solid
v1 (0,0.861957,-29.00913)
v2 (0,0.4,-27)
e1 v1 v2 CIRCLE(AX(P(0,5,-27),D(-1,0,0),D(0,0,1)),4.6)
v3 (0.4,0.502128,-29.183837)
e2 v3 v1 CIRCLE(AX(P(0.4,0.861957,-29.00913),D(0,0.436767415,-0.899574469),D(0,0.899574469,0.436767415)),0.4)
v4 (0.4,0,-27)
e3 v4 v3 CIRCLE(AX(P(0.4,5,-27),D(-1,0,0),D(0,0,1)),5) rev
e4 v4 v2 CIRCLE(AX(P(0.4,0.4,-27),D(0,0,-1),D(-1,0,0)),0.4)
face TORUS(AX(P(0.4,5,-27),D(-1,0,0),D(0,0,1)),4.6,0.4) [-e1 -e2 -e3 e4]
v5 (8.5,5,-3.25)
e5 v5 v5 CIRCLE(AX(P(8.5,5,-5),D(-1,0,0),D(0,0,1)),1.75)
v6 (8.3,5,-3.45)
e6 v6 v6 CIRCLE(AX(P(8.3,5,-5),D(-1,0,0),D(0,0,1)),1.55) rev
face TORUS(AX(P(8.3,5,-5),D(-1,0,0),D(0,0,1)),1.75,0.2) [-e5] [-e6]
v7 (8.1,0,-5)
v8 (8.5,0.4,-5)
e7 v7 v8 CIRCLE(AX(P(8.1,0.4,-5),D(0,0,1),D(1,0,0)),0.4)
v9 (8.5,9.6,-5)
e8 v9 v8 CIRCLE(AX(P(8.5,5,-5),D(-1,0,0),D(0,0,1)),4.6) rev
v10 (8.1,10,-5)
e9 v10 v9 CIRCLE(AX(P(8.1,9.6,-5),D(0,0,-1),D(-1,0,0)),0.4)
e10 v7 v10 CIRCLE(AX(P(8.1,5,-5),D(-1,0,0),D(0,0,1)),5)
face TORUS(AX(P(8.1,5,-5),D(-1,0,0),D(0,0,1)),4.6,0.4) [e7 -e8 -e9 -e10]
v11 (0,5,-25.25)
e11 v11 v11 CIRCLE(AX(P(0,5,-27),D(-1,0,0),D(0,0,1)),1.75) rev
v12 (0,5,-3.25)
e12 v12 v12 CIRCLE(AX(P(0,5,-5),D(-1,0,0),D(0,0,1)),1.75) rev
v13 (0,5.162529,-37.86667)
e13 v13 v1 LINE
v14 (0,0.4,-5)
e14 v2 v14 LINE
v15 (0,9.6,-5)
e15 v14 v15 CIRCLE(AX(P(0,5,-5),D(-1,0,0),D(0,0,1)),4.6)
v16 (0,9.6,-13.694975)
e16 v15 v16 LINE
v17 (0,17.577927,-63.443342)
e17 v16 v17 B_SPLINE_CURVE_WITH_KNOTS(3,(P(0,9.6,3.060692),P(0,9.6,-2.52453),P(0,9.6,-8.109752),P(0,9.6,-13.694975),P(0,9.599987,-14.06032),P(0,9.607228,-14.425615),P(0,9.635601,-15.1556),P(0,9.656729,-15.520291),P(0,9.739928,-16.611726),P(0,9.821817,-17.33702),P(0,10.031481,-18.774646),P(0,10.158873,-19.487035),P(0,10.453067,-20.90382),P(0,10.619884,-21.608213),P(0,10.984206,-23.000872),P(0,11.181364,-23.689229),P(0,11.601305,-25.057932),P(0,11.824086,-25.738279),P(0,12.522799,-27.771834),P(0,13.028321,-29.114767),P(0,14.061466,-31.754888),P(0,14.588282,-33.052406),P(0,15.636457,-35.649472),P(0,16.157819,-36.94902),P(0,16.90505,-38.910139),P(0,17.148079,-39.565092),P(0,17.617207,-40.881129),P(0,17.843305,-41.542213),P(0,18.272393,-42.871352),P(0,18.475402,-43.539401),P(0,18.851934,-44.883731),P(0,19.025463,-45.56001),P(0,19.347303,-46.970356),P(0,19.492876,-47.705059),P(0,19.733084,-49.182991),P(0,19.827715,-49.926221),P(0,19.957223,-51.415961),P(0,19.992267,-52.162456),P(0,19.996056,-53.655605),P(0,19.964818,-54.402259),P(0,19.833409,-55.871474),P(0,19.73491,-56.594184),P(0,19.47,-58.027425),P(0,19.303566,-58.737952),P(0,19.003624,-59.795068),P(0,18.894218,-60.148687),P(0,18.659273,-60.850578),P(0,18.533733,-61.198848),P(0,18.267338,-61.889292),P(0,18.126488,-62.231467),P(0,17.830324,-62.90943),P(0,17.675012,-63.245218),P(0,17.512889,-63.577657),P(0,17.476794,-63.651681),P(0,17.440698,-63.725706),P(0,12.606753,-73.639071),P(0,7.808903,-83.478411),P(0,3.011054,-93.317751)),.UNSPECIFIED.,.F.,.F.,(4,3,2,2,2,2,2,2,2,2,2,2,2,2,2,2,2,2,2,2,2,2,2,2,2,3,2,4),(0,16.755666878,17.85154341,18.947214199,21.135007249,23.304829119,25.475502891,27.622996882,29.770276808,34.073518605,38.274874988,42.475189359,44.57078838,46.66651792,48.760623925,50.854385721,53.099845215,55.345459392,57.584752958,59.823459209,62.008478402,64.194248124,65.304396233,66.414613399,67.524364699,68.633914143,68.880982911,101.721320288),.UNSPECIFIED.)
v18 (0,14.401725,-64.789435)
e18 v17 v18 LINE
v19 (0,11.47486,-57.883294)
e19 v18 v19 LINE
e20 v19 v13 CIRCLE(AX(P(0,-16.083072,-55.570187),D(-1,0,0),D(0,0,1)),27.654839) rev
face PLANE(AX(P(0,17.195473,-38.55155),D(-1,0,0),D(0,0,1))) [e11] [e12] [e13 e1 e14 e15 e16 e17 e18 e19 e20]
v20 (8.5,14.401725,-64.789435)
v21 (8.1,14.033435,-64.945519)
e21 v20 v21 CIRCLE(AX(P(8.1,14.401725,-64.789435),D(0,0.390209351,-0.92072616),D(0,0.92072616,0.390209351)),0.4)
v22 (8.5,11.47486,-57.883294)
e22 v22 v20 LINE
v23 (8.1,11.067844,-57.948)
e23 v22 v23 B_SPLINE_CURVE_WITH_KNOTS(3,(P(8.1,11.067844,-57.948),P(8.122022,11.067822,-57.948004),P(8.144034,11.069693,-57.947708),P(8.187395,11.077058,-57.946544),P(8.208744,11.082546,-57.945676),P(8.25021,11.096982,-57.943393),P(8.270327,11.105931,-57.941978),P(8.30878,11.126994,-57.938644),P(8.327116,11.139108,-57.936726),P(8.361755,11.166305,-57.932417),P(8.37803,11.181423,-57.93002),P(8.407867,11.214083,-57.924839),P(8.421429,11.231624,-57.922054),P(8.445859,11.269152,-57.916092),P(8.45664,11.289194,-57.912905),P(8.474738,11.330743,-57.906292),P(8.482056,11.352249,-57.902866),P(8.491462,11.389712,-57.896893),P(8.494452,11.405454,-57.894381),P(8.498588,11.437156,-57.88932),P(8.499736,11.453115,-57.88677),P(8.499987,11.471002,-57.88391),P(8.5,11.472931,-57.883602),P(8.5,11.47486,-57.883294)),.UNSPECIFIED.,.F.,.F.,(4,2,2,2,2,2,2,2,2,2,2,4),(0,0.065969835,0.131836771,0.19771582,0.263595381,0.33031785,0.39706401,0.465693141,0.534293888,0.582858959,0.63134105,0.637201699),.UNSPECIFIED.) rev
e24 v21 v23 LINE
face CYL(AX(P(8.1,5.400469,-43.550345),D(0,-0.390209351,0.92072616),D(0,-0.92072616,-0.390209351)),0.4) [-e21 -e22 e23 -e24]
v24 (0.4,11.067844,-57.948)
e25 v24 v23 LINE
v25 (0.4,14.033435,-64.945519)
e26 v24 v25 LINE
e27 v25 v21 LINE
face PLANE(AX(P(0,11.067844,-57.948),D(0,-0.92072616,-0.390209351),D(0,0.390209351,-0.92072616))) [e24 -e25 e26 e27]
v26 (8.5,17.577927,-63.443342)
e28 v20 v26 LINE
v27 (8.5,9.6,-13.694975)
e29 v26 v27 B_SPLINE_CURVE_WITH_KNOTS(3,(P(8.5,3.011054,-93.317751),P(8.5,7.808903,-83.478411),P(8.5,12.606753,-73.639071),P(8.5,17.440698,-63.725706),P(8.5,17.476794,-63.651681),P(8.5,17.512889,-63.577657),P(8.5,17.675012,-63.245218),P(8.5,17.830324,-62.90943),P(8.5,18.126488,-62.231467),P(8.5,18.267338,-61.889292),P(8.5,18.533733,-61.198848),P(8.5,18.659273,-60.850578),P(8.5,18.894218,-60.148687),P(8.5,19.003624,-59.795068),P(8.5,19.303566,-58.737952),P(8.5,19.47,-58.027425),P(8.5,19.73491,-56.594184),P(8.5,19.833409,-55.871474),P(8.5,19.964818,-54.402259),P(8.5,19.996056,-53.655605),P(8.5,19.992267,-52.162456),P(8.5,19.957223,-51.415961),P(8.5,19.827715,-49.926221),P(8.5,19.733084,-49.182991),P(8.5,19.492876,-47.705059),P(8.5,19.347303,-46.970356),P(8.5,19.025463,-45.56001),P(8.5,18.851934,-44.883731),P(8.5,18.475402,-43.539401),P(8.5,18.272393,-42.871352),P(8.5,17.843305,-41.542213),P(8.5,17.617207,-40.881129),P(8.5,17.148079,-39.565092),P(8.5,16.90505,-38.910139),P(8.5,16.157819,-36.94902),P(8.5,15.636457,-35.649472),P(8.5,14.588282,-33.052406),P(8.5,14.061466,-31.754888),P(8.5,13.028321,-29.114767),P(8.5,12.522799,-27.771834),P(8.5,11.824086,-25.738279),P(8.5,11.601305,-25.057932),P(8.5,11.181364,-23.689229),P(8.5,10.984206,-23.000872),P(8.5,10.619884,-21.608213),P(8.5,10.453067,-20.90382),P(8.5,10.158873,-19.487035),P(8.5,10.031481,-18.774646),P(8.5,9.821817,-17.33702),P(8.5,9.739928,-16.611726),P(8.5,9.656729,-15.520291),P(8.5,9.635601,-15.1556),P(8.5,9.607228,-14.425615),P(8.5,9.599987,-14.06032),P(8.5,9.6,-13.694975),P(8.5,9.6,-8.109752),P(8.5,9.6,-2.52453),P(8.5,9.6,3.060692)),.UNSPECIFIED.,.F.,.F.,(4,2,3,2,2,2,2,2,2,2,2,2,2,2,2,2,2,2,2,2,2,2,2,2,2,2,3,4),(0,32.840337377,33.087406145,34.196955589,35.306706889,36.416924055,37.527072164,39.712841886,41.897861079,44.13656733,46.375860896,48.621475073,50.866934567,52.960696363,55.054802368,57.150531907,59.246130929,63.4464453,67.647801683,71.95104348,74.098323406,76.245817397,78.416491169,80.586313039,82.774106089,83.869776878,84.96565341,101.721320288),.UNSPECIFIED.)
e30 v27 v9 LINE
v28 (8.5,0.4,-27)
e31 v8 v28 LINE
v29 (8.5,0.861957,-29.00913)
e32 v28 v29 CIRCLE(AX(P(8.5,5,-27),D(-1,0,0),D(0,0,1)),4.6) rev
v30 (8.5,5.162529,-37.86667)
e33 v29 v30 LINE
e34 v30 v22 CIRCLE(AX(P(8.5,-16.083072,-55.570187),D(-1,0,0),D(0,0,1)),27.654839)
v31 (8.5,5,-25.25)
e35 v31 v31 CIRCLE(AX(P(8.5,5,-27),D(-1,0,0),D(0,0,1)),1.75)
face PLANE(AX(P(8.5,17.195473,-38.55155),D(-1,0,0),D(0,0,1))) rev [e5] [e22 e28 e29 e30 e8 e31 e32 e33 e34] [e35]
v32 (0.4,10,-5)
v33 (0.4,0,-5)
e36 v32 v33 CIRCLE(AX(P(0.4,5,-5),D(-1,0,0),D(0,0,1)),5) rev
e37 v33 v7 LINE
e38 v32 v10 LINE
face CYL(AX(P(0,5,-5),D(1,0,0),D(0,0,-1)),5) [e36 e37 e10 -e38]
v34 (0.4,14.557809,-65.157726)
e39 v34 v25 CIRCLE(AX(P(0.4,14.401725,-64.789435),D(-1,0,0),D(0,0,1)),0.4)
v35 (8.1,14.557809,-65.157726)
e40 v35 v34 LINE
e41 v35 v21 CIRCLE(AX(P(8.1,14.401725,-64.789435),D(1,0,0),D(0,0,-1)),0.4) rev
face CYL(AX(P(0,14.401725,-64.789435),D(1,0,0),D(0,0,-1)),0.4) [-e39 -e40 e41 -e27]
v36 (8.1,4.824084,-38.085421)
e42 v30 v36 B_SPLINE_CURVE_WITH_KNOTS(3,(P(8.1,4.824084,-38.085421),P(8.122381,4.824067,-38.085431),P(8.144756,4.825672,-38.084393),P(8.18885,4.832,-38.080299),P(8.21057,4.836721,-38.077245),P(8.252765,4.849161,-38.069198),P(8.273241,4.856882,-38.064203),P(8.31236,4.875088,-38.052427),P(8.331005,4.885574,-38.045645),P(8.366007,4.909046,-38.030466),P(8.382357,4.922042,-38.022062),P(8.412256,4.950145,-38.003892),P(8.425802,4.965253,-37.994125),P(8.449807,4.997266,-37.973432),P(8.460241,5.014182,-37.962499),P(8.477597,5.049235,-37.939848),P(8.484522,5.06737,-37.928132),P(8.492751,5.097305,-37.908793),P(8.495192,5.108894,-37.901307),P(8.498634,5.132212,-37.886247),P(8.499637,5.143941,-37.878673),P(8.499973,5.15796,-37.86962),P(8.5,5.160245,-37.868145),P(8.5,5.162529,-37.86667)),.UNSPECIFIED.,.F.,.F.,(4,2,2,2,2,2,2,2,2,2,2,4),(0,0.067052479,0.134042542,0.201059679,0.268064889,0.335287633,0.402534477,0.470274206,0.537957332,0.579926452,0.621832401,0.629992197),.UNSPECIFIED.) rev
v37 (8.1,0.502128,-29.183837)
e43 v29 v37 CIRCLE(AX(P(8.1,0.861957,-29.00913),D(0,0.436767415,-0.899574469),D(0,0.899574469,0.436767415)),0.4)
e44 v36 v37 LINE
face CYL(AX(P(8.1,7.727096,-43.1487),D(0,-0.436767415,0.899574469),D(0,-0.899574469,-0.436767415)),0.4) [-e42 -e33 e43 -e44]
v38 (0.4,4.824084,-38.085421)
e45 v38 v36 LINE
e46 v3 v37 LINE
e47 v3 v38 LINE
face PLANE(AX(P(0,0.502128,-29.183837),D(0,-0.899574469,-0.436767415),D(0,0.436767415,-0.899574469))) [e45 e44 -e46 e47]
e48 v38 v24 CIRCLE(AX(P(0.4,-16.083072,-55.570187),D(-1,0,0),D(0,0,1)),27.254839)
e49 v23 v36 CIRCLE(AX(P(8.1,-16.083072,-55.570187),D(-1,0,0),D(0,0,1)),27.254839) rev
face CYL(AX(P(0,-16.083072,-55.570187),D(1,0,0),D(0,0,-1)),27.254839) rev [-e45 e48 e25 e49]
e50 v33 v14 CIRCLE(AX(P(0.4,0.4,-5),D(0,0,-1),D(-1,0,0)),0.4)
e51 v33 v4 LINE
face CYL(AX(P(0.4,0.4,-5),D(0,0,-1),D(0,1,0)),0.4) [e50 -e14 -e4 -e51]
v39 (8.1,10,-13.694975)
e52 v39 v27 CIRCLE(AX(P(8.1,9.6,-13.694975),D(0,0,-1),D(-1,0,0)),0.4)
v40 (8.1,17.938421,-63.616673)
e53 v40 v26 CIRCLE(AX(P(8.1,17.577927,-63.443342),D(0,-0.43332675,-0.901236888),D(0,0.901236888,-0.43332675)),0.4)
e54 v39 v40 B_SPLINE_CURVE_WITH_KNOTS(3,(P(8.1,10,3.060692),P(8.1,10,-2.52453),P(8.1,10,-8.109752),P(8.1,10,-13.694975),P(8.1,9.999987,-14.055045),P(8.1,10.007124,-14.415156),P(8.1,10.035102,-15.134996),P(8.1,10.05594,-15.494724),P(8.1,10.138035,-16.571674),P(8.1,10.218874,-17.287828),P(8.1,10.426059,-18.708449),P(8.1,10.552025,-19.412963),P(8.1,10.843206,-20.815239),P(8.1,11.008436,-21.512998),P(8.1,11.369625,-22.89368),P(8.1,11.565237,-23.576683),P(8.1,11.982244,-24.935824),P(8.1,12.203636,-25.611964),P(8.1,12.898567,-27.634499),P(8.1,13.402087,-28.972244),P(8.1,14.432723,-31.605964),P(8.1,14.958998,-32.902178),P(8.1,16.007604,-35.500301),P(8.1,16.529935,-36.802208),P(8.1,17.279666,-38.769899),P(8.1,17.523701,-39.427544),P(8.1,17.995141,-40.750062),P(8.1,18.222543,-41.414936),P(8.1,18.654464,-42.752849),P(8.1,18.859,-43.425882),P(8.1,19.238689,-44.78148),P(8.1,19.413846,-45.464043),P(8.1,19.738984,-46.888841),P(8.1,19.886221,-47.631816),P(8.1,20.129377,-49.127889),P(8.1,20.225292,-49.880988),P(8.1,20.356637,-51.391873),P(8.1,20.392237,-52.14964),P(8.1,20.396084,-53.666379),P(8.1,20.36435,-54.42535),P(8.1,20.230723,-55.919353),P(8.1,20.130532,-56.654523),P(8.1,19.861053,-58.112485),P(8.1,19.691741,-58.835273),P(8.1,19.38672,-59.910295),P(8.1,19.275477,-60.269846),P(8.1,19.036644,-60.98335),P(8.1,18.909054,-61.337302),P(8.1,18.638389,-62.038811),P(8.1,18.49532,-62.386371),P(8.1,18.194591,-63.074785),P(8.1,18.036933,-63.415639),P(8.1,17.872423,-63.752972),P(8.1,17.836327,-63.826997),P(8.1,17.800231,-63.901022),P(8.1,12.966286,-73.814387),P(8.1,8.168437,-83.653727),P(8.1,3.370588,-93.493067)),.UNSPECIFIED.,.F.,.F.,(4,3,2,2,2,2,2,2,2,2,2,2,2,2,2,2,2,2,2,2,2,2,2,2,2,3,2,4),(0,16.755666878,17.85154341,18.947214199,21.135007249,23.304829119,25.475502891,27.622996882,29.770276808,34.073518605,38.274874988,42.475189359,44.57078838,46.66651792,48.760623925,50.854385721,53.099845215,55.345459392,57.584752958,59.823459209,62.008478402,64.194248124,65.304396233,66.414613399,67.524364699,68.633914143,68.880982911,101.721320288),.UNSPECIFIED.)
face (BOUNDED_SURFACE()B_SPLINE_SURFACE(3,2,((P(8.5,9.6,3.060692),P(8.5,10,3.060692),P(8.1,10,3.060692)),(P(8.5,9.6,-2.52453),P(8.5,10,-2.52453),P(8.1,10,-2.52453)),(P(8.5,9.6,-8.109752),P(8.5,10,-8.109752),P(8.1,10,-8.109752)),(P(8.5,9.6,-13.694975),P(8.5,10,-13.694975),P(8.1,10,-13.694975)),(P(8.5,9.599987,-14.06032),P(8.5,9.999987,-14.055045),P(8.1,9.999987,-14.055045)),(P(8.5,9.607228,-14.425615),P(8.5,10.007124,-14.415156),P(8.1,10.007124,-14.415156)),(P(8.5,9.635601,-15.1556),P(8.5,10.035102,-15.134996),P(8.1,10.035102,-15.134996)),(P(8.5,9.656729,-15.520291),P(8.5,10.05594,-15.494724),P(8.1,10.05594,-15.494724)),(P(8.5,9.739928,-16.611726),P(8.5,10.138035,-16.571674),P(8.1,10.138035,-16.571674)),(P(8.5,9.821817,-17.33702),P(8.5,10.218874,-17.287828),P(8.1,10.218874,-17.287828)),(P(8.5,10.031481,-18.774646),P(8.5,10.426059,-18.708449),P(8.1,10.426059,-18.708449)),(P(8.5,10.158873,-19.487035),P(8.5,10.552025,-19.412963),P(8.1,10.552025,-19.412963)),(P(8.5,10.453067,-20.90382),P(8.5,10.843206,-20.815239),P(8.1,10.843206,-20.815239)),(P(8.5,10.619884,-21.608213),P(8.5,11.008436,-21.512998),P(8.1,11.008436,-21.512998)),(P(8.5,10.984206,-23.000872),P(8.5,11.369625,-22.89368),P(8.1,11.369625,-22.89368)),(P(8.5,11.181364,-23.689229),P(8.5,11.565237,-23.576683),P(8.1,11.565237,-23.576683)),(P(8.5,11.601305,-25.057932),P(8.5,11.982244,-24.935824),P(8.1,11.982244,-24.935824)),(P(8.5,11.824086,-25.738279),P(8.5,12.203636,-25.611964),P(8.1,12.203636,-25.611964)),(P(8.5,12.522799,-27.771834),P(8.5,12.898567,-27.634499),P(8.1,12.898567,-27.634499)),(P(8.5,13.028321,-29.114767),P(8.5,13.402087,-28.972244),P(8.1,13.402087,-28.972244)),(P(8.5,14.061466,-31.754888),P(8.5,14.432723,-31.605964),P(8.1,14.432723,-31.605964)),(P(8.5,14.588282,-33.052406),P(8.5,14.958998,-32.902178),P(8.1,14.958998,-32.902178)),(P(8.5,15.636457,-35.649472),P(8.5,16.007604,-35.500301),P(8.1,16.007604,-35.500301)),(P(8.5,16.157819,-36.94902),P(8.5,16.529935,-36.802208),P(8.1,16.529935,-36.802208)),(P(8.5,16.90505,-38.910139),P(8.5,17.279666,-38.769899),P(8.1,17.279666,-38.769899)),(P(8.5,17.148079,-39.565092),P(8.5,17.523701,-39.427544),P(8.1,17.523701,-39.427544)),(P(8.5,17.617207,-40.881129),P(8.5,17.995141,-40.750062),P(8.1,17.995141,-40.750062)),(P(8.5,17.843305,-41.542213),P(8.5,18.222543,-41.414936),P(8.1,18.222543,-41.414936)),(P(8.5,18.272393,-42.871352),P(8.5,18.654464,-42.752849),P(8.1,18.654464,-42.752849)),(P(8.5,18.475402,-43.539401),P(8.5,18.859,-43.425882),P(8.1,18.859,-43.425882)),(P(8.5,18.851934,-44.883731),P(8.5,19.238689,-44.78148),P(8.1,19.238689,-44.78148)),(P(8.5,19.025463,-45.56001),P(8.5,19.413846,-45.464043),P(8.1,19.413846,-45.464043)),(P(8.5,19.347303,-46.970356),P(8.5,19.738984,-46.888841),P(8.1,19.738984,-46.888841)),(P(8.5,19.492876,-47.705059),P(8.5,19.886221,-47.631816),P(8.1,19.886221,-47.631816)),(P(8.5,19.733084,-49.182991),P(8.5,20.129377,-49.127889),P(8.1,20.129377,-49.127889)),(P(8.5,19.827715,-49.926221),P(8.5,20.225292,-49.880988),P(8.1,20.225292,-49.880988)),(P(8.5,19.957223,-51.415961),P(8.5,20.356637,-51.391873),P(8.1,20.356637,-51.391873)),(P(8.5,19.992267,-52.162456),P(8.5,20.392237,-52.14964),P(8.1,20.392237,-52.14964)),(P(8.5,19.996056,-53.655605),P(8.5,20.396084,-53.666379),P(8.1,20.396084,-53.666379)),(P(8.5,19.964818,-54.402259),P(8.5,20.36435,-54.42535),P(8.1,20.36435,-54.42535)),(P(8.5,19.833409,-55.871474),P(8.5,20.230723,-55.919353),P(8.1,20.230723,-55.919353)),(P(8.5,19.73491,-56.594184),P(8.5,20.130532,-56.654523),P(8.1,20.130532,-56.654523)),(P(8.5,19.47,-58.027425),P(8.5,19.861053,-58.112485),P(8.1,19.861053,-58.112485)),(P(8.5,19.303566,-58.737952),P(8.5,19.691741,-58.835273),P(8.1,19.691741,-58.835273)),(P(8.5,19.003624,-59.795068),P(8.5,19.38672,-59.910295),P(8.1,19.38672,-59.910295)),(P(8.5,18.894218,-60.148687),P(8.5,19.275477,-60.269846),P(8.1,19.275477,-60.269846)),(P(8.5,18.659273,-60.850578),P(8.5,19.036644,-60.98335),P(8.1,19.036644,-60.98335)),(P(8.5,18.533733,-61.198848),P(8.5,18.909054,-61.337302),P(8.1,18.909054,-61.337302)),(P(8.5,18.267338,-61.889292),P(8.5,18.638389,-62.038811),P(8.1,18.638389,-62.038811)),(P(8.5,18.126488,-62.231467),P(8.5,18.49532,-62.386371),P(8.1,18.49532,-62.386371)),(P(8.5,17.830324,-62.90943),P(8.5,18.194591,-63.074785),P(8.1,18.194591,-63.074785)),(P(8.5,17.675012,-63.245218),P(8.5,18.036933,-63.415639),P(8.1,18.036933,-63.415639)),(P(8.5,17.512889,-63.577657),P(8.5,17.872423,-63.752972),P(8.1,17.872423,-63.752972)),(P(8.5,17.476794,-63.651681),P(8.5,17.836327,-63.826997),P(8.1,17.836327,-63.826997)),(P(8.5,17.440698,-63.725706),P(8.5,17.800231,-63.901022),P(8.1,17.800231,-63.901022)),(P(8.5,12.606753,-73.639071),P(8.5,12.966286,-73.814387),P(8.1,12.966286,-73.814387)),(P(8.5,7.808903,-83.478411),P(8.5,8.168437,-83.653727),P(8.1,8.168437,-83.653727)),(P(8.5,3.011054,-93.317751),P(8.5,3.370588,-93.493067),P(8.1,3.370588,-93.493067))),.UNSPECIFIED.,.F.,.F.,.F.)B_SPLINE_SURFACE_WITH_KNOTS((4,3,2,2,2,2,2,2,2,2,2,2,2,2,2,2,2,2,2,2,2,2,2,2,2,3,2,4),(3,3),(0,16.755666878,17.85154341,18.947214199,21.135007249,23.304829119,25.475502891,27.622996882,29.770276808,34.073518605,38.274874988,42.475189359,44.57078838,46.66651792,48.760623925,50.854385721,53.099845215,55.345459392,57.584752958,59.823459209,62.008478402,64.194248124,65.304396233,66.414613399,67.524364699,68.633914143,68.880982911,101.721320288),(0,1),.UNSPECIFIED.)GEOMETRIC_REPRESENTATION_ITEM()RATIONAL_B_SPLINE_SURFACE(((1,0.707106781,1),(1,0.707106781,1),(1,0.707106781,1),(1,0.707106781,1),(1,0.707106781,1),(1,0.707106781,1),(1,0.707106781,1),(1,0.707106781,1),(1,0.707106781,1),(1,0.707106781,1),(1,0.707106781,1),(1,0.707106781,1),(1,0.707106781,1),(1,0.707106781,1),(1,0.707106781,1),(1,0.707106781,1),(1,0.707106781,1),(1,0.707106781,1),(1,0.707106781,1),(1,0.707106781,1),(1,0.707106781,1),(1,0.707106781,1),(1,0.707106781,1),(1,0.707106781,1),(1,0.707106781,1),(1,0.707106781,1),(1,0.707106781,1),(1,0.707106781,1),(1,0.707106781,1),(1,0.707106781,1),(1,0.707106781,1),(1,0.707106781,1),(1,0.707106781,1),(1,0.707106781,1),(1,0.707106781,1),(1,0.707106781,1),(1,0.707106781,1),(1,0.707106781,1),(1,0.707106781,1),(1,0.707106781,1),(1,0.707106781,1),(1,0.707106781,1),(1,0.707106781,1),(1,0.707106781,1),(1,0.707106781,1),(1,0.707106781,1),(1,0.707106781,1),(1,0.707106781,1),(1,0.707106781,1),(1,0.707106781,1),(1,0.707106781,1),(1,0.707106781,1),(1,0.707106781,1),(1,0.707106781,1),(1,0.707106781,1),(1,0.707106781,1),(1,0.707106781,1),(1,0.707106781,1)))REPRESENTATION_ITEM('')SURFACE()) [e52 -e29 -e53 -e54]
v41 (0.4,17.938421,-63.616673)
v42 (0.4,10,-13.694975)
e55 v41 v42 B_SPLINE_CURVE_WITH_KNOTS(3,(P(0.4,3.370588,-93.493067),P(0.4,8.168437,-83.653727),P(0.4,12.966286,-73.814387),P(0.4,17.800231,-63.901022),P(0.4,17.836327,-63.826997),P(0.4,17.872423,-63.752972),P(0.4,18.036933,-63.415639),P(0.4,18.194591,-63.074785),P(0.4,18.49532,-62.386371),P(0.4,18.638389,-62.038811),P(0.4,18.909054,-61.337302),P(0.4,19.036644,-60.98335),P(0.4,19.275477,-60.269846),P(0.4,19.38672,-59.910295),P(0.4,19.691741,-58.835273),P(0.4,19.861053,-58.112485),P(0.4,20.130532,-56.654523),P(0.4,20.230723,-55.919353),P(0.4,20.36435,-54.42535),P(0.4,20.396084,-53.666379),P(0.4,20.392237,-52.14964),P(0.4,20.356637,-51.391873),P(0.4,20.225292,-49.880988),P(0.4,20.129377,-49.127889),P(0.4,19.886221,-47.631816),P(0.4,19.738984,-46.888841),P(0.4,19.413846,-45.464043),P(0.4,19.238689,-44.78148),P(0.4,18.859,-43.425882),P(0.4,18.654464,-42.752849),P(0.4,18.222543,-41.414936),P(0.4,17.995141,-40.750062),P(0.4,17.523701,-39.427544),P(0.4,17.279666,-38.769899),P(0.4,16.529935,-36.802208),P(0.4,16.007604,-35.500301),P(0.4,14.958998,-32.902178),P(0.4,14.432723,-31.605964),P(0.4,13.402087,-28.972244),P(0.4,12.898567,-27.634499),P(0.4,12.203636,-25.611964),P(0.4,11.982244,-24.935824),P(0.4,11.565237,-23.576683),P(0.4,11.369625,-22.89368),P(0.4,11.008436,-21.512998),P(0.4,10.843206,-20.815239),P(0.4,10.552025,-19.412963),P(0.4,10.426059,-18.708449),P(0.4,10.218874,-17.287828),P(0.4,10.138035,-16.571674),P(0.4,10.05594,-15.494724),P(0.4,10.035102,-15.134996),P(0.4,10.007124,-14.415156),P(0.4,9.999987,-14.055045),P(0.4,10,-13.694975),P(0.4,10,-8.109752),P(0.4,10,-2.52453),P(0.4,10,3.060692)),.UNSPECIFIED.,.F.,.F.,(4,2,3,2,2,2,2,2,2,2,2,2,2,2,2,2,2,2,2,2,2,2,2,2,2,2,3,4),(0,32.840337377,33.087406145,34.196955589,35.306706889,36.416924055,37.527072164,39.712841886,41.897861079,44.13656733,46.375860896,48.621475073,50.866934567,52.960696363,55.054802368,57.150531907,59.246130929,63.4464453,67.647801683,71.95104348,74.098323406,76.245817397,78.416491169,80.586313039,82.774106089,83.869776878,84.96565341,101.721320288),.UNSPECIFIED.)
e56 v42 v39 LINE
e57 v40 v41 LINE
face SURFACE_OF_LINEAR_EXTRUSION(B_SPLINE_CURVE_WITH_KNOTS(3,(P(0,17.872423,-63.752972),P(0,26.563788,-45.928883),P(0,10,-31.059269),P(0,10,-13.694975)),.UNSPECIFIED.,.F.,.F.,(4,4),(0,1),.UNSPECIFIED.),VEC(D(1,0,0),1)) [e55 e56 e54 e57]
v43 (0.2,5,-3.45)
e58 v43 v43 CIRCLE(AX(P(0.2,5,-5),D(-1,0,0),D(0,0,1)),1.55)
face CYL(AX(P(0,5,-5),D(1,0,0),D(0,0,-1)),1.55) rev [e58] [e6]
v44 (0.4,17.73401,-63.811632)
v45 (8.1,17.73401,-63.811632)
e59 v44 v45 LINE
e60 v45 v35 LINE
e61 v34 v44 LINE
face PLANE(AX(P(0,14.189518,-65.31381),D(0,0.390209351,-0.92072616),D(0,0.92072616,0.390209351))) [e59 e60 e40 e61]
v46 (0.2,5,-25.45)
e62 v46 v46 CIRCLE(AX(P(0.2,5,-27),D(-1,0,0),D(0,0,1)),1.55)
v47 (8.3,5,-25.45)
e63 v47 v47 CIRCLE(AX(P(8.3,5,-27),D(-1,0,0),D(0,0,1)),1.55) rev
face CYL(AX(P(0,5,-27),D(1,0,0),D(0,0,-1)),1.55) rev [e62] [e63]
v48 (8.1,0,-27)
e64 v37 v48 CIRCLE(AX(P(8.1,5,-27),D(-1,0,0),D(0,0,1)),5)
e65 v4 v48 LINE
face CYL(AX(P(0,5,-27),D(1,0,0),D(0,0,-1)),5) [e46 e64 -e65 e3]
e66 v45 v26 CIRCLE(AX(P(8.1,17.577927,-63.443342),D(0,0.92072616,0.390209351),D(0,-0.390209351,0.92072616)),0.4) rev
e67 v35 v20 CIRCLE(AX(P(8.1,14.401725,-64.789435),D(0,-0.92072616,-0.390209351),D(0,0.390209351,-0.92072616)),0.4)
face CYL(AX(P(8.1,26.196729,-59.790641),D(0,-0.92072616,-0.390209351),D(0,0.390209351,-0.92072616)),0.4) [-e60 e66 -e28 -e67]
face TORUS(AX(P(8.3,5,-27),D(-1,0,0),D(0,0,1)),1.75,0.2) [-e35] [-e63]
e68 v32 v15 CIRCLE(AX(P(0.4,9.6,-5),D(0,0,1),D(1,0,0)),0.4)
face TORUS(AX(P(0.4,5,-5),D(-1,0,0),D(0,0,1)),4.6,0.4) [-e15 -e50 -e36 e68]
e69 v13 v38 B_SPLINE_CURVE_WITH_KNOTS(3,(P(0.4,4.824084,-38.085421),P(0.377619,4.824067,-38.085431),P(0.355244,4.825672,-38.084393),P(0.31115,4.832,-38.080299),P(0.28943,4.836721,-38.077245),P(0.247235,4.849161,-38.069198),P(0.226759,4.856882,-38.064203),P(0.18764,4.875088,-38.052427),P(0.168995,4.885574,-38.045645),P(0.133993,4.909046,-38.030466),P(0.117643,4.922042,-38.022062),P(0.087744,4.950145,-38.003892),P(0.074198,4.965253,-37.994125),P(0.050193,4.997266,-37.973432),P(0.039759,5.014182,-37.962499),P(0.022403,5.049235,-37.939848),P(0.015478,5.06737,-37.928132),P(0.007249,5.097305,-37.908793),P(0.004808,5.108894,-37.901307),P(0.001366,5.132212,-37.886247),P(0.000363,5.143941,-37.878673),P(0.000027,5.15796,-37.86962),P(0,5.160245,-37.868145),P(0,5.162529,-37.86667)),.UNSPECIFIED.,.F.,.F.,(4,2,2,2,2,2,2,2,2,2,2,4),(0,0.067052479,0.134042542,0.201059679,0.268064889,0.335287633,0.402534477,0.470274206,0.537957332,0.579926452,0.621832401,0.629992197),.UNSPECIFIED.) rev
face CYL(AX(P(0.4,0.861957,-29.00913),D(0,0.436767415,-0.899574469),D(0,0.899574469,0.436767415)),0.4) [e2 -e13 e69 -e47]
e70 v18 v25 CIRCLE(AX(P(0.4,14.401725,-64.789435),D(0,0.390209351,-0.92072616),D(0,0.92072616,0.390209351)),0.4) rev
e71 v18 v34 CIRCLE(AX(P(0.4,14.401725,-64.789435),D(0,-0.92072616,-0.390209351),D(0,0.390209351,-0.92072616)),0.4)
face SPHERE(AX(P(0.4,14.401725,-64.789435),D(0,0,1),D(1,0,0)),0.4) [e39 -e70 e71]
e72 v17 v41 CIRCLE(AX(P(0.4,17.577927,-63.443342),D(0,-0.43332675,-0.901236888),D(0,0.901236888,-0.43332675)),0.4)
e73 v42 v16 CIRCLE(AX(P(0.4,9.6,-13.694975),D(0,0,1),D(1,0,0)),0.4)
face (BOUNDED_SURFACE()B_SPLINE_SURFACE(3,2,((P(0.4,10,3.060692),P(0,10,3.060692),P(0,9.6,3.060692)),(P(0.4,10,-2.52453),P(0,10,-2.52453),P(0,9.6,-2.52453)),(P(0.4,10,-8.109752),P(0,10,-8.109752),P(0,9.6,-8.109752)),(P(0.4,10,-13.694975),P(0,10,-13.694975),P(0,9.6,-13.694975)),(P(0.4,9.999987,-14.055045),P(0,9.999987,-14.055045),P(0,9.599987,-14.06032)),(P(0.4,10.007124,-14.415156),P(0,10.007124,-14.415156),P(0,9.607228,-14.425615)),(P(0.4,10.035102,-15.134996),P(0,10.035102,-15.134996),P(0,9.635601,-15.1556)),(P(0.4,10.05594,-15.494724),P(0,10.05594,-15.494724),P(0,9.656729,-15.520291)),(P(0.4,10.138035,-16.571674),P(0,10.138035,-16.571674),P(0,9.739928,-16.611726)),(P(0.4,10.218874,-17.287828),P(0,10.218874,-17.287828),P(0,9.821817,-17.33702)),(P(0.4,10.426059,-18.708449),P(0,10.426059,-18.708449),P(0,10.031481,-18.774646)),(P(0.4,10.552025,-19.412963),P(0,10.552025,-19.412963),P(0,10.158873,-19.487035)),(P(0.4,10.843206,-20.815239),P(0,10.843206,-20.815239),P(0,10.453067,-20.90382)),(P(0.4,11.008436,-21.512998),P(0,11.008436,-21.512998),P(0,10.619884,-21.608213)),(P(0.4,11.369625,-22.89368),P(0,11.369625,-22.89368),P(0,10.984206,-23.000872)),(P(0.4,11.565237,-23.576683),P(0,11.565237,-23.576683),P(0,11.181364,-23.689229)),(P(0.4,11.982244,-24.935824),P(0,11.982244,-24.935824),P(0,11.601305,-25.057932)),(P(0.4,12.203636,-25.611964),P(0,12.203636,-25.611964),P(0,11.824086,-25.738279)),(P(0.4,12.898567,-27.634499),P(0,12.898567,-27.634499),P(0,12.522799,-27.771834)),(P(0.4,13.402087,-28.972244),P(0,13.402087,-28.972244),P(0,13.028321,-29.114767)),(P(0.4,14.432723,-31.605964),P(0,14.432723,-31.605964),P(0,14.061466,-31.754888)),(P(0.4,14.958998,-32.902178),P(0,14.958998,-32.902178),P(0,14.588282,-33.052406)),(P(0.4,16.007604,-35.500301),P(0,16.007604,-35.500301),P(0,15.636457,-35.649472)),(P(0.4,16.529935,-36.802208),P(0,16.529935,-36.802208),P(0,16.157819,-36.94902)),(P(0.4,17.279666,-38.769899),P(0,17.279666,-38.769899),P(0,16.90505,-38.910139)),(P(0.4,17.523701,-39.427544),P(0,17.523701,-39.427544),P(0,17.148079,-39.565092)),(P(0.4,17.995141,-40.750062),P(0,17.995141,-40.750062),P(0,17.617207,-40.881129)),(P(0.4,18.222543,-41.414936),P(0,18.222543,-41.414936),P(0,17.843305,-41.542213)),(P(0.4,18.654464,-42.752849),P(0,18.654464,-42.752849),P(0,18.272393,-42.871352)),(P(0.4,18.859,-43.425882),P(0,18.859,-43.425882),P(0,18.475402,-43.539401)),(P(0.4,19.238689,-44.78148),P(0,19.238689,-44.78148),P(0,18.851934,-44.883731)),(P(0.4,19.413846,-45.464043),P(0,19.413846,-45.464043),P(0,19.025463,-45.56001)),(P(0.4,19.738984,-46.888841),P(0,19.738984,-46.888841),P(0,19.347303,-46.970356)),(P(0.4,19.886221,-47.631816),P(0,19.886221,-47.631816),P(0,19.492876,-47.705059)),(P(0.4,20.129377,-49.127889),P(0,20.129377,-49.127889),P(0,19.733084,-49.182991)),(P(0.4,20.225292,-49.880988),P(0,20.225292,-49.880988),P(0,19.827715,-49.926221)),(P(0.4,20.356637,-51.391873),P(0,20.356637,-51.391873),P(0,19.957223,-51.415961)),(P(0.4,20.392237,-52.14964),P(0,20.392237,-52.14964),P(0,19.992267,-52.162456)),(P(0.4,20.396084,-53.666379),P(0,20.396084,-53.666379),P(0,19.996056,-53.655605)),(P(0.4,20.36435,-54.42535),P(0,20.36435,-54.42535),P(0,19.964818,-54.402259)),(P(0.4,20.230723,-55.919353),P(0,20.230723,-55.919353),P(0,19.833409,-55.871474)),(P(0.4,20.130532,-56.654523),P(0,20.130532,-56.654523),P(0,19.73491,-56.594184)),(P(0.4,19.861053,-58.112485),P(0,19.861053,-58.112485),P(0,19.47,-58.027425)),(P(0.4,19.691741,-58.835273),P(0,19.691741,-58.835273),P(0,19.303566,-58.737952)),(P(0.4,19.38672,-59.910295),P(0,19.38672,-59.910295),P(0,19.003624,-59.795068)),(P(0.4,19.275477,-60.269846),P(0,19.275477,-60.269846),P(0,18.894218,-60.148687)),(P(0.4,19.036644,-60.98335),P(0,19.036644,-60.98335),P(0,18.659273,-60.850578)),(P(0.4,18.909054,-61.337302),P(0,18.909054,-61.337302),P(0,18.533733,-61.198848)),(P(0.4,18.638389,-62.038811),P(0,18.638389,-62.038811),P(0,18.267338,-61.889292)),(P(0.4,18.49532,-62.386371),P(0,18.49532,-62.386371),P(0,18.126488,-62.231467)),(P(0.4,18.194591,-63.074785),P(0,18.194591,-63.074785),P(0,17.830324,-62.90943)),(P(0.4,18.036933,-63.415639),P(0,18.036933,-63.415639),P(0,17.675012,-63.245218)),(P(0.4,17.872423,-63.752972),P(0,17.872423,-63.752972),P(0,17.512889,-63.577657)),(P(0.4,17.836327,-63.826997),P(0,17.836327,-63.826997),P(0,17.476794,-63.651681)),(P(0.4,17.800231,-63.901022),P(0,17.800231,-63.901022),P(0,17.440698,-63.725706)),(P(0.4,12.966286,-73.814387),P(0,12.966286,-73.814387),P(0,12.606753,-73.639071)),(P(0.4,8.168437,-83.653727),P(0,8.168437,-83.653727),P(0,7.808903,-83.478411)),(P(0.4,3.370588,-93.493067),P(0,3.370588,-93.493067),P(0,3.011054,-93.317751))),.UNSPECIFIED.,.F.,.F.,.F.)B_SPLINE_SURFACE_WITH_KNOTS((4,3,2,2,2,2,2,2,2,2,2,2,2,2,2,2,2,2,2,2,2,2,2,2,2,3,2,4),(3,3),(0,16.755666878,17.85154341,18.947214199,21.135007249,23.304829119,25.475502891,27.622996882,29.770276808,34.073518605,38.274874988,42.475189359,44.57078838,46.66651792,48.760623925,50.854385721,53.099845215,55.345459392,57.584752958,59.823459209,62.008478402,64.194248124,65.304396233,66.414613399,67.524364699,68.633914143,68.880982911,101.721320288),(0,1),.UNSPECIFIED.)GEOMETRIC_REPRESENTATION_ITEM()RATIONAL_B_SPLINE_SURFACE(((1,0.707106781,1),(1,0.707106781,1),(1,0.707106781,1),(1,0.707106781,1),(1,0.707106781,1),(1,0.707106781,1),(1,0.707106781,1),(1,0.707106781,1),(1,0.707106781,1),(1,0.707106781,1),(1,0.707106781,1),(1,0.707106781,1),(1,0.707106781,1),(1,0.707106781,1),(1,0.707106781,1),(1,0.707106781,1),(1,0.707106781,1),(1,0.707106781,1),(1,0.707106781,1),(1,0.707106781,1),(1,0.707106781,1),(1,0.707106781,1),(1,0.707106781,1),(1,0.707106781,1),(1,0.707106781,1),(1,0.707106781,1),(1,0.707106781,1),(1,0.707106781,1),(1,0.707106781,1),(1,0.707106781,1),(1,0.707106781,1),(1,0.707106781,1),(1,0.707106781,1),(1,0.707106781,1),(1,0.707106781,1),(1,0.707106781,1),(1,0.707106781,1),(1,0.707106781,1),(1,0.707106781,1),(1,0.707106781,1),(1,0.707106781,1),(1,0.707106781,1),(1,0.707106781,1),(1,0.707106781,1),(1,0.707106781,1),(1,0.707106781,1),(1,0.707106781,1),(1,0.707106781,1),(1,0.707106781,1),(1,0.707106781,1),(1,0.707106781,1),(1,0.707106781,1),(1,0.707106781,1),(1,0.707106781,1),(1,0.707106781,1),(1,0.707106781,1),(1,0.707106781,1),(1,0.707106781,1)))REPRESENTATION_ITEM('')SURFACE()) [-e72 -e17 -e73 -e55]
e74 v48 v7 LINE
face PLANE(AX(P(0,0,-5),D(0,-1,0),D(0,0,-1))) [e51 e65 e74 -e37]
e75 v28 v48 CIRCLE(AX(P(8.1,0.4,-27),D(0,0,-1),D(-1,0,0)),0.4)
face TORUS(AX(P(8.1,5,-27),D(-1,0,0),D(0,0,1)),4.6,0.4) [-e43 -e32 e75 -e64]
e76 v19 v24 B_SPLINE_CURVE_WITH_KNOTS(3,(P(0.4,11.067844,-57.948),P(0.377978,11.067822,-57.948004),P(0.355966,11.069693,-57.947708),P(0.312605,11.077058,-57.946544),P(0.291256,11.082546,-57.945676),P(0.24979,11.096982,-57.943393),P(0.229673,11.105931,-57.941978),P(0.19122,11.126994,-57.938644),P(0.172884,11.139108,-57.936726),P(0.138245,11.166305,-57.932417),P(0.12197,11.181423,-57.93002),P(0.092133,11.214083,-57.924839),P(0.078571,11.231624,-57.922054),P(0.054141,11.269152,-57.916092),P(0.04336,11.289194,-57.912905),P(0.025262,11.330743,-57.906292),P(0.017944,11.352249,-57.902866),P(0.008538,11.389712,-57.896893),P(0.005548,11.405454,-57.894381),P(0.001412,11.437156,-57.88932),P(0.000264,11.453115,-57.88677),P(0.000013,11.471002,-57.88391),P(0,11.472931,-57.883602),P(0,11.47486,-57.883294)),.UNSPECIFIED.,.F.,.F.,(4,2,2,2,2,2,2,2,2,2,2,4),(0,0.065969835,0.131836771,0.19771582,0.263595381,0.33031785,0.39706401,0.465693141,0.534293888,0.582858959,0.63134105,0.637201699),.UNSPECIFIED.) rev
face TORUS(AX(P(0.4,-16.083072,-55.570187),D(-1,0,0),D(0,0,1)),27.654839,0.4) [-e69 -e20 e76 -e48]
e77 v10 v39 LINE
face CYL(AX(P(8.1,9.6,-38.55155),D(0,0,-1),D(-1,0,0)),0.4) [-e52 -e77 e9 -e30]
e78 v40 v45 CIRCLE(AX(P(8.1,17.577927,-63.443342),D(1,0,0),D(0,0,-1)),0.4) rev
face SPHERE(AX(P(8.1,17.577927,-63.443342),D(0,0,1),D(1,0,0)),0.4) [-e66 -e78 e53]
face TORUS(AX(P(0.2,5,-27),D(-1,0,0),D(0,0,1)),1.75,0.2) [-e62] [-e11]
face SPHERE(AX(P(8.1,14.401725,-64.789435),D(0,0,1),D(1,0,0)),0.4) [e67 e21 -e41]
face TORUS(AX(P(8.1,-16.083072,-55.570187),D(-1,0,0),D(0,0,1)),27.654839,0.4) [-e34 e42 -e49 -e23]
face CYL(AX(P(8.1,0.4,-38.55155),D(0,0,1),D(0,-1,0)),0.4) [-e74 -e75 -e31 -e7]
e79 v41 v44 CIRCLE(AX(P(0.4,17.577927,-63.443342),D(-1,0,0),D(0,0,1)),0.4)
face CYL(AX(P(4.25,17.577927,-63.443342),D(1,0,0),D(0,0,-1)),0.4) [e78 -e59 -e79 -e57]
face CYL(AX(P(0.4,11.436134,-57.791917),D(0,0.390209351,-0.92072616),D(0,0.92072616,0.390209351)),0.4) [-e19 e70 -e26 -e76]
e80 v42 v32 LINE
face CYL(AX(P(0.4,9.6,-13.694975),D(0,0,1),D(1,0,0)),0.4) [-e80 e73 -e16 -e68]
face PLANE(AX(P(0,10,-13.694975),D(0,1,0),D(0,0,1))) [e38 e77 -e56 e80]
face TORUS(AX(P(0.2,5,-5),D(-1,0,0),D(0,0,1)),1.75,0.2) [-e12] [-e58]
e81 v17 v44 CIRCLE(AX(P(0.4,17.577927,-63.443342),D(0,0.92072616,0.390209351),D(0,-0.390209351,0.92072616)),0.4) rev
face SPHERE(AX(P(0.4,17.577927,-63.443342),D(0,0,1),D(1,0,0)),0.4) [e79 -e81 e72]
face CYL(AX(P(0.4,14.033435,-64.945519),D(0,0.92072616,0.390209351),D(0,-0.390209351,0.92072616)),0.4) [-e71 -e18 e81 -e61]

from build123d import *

# Parameters (mm, degrees)
SKETCH_1_R            = 1.75
EXTRUDE_1_DEPTH       = 8.5
EXTRUDE_2_OUTLINE_R   = 1.75
EXTRUDE_2_OUTLINE_R_2 = 1.55
EXTRUDE_2_DEPTH       = 8.5
FILLET_1_R            = 0.4
FILLET_2_R            = 0.2


# Read off the part's stored shape, not the designer's step: 凸台-拉伸2
with BuildPart() as part:
    # 草图1 → 凸台-拉伸1 (new body)
    with BuildSketch(Plane(origin=(8.5, 0, 0), x_dir=(0, 0, -1), z_dir=(1, 0, 0))):
        with BuildLine():
            Line((13.694974759, 10), (5, 10))
            ThreePointArc((5, 10), (0, 5), (5, 0))
            Line((5, 0), (27, 0))
            ThreePointArc((27, 0), (28.120410255, 0.12714859), (29.183837075, 0.502127655))
            Line((29.183837075, 0.502127655), (38.08542066, 4.824084077))
            ThreePointArc((38.08542066, 4.824084077), (47.396990541, 9.917410338), (57.948000409, 11.067843667))
            Line((57.948000409, 11.067843667), (65.313809691, 14.189518476))
            Line((65.313809691, 14.189518476), (63.752972286, 17.872423117))
            add(Edge.make_bspline(
                [(63.752972286, 17.872423117), (45.928882678, 26.563787963), (31.059268621, 10), (13.694974759, 10)],
                knots=[0, 0, 0, 0, 1, 1, 1, 1], degree=3))
        make_face()
        with Locations(Location((5, 5, 0), (0, 0, 180))):
            Circle(SKETCH_1_R, mode=Mode.SUBTRACT)
        with Locations(Location((27, 5, 0), (0, 0, 180))):
            Circle(SKETCH_1_R, mode=Mode.SUBTRACT)
    extrude(amount=-EXTRUDE_1_DEPTH)

    # 凸台-拉伸2 outline → 凸台-拉伸2 (add)
    # profile 1 of 2: a face of its own
    with BuildSketch(Plane.YZ):
        with Locations((5, -5)):
            Circle(EXTRUDE_2_OUTLINE_R)
        with Locations((5, -5)):
            Circle(EXTRUDE_2_OUTLINE_R_2, mode=Mode.SUBTRACT)
    # profile 2 of 2: a face of its own
    with BuildSketch(Plane.YZ):
        with Locations((5, -27)):
            Circle(EXTRUDE_2_OUTLINE_R)
        with Locations((5, -27)):
            Circle(EXTRUDE_2_OUTLINE_R_2, mode=Mode.SUBTRACT)
    extrude(amount=EXTRUDE_2_DEPTH)

    # 圆角1
    fillet_1_edges = [part.edges().sort_by_distance(p)[0] for p in [
        (8.5, 9.917410338, -47.396990541),
        (8.5, 2.663105866, -33.634628868),
        (8.5, 0.12714859, -28.120410255),
        (8.5, 0, -16),
        (8.5, 5, 0),
        (8.5, 10, -9.347487379),
        (8.5, 17.192155422, -38.542735392),
        (0, 5, 0),
        (4.25, 17.872423117, -63.752972286),
        (4.25, 14.189518476, -65.313809691),
        (0, 0, -16),
        (0, 0.12714859, -28.120410255),
        (0, 2.663105866, -33.634628868),
        (0, 9.917410338, -47.396990541),
        (0, 12.628681071, -61.63090505),
        (0, 16.030970797, -64.533390989),
        (0, 17.192155422, -38.542735392),
        (0, 10, -9.347487379),
        (8.5, 16.030970797, -64.533390989),
        (8.5, 12.628681071, -61.63090505),
    ]]
    fillet(fillet_1_edges, radius=FILLET_1_R)

    # 圆角2
    fillet_2_edges = [part.edges().sort_by_distance(p)[0] for p in [
        (0, 3.45, -27),
        (8.5, 3.45, -27),
        (0, 3.45, -5),
        (8.5, 3.45, -5),
    ]]
    fillet(fillet_2_edges, radius=FILLET_2_R)


solid = part.part
